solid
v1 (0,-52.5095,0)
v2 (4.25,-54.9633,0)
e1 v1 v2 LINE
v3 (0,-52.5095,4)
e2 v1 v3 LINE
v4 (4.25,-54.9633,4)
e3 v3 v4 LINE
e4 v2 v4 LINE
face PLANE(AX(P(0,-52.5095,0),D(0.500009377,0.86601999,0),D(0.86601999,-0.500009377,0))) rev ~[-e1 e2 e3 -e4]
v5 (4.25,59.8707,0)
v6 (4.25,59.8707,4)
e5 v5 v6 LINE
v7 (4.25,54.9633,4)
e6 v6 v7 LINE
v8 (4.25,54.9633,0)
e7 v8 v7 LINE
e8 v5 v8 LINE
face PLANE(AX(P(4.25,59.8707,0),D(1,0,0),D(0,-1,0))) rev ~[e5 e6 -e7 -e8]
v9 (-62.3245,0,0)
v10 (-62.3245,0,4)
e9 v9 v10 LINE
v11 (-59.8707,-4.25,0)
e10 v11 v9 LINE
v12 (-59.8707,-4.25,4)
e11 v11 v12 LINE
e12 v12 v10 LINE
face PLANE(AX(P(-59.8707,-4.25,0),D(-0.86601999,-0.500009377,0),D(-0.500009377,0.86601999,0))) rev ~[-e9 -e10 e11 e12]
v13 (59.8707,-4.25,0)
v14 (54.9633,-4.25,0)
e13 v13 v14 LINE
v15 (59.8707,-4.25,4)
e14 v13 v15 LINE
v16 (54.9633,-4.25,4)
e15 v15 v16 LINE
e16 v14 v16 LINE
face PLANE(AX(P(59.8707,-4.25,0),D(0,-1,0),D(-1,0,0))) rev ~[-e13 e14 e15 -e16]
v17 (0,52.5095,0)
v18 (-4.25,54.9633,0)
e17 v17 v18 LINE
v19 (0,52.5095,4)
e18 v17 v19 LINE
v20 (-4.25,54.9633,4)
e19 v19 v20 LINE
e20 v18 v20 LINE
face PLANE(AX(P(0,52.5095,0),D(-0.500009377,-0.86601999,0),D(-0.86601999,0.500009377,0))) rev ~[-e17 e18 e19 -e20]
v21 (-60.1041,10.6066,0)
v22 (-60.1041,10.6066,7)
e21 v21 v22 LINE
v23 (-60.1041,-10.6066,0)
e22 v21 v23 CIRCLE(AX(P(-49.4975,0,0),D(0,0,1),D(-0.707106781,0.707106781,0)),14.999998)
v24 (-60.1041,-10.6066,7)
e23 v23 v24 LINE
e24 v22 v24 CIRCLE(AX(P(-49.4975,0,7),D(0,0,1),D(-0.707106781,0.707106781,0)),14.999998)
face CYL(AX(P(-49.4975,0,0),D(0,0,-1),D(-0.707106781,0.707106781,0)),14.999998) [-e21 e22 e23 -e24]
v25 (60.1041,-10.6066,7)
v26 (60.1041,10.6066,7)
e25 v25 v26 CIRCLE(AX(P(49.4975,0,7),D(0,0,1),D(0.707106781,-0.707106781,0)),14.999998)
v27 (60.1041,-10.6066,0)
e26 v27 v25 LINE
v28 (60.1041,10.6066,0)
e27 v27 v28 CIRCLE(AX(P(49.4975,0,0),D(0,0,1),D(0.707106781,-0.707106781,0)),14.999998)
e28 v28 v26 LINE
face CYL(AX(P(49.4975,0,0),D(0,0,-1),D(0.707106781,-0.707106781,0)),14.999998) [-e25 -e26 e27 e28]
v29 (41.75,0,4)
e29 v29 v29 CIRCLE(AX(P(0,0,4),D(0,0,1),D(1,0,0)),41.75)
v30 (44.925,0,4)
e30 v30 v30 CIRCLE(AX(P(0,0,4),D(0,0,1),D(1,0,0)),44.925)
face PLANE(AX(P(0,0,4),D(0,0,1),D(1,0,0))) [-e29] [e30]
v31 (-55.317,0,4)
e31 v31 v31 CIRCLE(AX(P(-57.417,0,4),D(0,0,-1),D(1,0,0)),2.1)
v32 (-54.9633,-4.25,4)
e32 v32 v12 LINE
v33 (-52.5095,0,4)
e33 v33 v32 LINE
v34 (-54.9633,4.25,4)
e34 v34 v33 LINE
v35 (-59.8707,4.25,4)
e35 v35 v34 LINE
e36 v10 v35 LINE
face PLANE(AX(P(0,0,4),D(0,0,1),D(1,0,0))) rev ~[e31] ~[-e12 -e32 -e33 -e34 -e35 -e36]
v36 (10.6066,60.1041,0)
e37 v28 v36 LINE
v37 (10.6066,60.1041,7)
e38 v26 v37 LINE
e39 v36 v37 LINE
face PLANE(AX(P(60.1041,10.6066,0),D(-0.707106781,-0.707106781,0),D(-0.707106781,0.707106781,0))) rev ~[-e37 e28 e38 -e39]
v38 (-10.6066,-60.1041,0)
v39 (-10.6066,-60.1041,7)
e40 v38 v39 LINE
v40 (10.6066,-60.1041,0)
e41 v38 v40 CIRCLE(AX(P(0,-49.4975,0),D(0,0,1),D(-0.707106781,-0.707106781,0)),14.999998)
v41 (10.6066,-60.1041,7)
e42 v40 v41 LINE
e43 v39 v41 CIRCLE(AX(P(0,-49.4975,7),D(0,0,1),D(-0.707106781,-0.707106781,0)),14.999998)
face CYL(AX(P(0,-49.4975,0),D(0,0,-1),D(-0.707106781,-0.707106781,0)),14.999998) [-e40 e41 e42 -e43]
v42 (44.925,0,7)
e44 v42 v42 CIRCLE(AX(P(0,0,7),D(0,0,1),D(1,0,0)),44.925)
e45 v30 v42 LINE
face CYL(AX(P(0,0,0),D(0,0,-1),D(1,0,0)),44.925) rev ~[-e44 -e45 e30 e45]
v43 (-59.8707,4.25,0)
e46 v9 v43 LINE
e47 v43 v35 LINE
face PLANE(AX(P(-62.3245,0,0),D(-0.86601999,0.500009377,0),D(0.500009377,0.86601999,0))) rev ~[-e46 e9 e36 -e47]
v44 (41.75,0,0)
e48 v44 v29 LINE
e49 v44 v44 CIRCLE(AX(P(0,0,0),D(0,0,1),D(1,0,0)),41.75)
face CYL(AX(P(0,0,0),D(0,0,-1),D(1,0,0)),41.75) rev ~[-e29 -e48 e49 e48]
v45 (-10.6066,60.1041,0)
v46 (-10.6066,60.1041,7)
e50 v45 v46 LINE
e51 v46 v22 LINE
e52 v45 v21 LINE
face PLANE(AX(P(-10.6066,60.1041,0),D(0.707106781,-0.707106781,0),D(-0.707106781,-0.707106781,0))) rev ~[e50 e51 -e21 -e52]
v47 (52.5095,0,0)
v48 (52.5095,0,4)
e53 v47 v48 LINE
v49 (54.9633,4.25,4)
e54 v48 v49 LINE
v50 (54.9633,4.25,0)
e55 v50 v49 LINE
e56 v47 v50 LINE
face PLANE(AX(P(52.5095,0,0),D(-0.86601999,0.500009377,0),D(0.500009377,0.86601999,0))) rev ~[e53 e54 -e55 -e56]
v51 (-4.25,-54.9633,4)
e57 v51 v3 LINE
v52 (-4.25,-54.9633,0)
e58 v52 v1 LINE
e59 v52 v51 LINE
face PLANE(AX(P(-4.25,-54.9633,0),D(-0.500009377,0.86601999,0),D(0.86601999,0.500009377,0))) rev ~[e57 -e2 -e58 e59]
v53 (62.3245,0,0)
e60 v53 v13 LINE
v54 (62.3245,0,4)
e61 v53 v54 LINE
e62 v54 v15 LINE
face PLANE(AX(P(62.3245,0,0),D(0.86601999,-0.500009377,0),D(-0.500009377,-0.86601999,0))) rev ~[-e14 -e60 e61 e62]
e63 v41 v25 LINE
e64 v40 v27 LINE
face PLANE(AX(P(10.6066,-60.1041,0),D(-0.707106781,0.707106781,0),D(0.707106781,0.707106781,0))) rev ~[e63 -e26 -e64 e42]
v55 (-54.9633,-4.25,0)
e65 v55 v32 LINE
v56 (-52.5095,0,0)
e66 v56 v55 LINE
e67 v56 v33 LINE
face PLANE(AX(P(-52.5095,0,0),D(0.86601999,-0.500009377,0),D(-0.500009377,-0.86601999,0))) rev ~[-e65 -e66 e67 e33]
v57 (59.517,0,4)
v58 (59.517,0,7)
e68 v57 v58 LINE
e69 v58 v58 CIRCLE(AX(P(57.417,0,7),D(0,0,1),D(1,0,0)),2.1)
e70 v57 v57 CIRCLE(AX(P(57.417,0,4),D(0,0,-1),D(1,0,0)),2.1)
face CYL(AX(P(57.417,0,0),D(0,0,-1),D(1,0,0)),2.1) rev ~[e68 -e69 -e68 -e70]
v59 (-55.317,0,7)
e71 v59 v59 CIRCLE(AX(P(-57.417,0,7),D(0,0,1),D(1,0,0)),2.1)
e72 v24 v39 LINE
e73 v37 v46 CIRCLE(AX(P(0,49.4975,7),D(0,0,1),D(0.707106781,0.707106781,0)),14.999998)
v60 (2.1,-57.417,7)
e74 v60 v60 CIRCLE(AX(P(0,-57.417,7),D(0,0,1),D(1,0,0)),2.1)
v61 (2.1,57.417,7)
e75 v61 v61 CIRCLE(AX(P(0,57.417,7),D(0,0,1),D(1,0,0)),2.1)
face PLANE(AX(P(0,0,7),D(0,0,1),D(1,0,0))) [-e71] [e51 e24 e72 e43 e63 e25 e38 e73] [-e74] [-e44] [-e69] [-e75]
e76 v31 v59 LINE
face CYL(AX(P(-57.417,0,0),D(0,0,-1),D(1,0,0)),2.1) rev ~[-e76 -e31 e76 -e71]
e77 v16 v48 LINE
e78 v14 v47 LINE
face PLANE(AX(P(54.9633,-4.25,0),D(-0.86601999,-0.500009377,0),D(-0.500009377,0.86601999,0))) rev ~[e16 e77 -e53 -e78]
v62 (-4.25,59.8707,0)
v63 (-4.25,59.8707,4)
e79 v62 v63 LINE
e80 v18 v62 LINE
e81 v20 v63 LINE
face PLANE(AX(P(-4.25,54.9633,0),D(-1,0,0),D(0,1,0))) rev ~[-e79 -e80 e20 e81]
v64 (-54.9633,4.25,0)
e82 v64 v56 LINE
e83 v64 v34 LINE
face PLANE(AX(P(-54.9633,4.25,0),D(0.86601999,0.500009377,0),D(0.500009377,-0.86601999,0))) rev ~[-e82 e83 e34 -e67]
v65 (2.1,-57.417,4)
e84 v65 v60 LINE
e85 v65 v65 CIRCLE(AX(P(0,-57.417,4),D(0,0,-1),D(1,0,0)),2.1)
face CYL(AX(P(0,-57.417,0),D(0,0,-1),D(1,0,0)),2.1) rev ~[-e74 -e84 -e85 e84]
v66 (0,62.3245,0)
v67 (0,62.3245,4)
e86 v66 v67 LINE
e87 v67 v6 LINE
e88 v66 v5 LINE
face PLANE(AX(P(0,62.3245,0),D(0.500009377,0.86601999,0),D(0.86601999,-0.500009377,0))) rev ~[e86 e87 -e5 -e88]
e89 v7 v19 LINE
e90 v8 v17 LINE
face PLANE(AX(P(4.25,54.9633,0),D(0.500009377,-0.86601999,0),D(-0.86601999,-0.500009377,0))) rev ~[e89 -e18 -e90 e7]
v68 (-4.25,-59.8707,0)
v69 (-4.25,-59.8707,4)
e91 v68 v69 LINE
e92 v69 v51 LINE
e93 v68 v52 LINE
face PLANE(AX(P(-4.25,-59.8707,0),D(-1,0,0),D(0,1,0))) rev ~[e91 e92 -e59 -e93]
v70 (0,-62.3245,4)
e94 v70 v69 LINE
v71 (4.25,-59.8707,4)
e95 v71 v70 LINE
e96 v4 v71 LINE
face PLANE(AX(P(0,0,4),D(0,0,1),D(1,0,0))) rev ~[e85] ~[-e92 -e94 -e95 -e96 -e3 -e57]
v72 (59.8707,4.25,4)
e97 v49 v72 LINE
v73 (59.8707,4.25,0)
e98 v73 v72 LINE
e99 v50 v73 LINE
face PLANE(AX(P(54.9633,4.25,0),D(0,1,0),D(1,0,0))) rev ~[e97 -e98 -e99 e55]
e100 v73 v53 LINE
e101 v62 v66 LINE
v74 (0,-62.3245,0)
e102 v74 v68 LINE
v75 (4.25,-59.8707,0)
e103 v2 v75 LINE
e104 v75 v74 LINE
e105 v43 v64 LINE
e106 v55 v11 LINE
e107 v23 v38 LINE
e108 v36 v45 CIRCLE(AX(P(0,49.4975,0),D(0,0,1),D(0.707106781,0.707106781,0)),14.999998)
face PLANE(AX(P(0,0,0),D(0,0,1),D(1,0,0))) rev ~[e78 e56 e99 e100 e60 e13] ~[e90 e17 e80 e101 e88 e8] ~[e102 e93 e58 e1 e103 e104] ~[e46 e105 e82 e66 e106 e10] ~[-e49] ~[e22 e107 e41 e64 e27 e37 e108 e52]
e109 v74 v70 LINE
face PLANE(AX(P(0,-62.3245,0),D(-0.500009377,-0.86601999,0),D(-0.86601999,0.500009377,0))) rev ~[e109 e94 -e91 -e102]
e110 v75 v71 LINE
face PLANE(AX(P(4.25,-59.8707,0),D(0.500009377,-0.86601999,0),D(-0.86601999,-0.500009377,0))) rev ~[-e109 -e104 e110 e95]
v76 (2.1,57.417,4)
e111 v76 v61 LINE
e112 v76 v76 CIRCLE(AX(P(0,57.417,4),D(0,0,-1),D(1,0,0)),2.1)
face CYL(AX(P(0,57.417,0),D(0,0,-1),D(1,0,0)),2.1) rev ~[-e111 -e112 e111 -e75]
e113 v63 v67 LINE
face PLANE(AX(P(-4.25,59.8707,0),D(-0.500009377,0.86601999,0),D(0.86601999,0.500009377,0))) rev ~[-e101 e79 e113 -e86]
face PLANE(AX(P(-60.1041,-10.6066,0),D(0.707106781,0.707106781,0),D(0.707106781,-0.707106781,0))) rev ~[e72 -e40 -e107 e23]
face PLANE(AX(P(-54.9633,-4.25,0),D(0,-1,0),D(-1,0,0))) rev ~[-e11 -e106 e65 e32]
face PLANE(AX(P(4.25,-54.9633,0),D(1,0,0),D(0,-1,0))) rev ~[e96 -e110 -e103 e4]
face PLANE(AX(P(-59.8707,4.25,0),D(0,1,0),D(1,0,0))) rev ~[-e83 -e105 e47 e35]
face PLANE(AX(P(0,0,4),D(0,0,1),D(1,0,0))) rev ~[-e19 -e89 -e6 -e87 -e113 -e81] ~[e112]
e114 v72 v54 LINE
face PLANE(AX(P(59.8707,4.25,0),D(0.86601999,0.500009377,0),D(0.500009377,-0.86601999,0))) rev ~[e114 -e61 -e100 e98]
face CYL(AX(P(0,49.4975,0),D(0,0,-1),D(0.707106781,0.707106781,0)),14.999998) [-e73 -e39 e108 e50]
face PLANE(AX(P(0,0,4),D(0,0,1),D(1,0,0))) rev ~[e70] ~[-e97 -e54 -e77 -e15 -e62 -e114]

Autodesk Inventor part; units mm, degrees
ref_plane "YZ Plane" through (0, 0, 0) normal (1, 0, 0) x (0, 1, 0)
ref_plane "XZ Plane" through (0, 0, 0) normal (0, 1, 0) x (-1, 0, 0)
ref_plane "XY Plane" through (0, 0, 0) normal (0, 0, 1) x (1, 0, 0)
sketch "Sketch1" plane through (0, 0, 0) normal (0, 0, 1) x (1, 0, 0)
  circle A0 centre (0, 0) radius 44.925
  circle A1 centre (0, 0) radius 57.417 construction
  circle A2 centre (-57.417, 0) radius 2.1
  circle A3 centre (0, -57.417) radius 2.1
  circle A4 centre (57.417, 0) radius 2.1
  circle A5 centre (0, 57.417) radius 2.1
  circle A6 centre (0, 0) radius 41.75
  line L0 (0, 62.3245) -> (4.25, 59.8707)
  line L1 (4.25, 59.8707) -> (4.25, 54.9633)
  line L2 (4.25, 54.9633) -> (0, 52.5095)
  line L3 (0, 52.5095) -> (-4.25, 54.9633)
  line L4 (-4.25, 54.9633) -> (-4.25, 59.8707)
  line L5 (-4.25, 59.8707) -> (0, 62.3245)
  line L6 (60.1041, 10.6066) -> (10.6066, 60.1041)
  line L7 (-10.6066, 60.1041) -> (-60.1041, 10.6066)
  line L8 (-60.1041, -10.6066) -> (-10.6066, -60.1041)
  line L9 (10.6066, -60.1041) -> (60.1041, -10.6066)
  arc A7 (-10.6066, -60.1041) -> (10.6066, -60.1041) centre (0, -49.4975) ccw
  arc A8 (-60.1041, 10.6066) -> (-60.1041, -10.6066) centre (-49.4975, 0) ccw
  arc A9 (10.6066, 60.1041) -> (-10.6066, 60.1041) centre (0, 49.4975) ccw
  arc A10 (60.1041, -10.6066) -> (60.1041, 10.6066) centre (49.4975, 0) ccw
  line L10 (-59.8707, -4.25) -> (-62.3245, 0)
  line L11 (-54.9633, -4.25) -> (-59.8707, -4.25)
  line L12 (-62.3245, 0) -> (-59.8707, 4.25)
  line L13 (-59.8707, 4.25) -> (-54.9633, 4.25)
  line L14 (-54.9633, 4.25) -> (-52.5095, 0)
  line L15 (-52.5095, 0) -> (-54.9633, -4.25)
  line L16 (4.25, -59.8707) -> (0, -62.3245)
  line L17 (4.25, -54.9633) -> (4.25, -59.8707)
  line L18 (0, -62.3245) -> (-4.25, -59.8707)
  line L19 (-4.25, -59.8707) -> (-4.25, -54.9633)
  line L20 (-4.25, -54.9633) -> (0, -52.5095)
  line L21 (0, -52.5095) -> (4.25, -54.9633)
  line L22 (59.8707, 4.25) -> (62.3245, 0)
  line L23 (54.9633, 4.25) -> (59.8707, 4.25)
  line L24 (62.3245, 0) -> (59.8707, -4.25)
  line L25 (59.8707, -4.25) -> (54.9633, -4.25)
  line L26 (54.9633, -4.25) -> (52.5095, 0)
  line L27 (52.5095, 0) -> (54.9633, 4.25)
  point P0 (70.7107, 0)
  point P1 (0, 70.7107)
  point P2 (-70.7107, 0)
  point P3 (0, -70.7107)
  dimension "d1" = 114.834
  dimension "d0" = 89.85
  dimension "d2" = 4.2
  dimension "d5" = 360
  dimension "d8" = 83.5
  dimension "d18" = 8.5
  dimension "d25" = 100
  dimension "d26" = 100
  dimension "d27" = 15
  dimension "d30" = 360
extrude "Extrusion1" add sketch "Sketch1" along normal blind 7 contours L0 L1 L2 L3 L4 L5 | A10 L9 A7 L8 A8 L7 A9 L6 | L10 L12 L13 L14 L15 L11 | L16 L18 L19 L20 L21 L17 | L22 L24 L25 L26 L27 L23
extrude "Extrusion2" add sketch "Sketch1" along normal blind 4 contours A0
extrude "Extrusion3" cut sketch "Sketch1" along normal blind 4 contours A2 | A3 | A4 | A5 | L0 L1 L2 L3 L4 L5 | L10 L12 L13 L14 L15 L11 | L16 L18 L19 L20 L21 L17 | L22 L24 L25 L26 L27 L23
properties part number "Fix_bearing_Base"
